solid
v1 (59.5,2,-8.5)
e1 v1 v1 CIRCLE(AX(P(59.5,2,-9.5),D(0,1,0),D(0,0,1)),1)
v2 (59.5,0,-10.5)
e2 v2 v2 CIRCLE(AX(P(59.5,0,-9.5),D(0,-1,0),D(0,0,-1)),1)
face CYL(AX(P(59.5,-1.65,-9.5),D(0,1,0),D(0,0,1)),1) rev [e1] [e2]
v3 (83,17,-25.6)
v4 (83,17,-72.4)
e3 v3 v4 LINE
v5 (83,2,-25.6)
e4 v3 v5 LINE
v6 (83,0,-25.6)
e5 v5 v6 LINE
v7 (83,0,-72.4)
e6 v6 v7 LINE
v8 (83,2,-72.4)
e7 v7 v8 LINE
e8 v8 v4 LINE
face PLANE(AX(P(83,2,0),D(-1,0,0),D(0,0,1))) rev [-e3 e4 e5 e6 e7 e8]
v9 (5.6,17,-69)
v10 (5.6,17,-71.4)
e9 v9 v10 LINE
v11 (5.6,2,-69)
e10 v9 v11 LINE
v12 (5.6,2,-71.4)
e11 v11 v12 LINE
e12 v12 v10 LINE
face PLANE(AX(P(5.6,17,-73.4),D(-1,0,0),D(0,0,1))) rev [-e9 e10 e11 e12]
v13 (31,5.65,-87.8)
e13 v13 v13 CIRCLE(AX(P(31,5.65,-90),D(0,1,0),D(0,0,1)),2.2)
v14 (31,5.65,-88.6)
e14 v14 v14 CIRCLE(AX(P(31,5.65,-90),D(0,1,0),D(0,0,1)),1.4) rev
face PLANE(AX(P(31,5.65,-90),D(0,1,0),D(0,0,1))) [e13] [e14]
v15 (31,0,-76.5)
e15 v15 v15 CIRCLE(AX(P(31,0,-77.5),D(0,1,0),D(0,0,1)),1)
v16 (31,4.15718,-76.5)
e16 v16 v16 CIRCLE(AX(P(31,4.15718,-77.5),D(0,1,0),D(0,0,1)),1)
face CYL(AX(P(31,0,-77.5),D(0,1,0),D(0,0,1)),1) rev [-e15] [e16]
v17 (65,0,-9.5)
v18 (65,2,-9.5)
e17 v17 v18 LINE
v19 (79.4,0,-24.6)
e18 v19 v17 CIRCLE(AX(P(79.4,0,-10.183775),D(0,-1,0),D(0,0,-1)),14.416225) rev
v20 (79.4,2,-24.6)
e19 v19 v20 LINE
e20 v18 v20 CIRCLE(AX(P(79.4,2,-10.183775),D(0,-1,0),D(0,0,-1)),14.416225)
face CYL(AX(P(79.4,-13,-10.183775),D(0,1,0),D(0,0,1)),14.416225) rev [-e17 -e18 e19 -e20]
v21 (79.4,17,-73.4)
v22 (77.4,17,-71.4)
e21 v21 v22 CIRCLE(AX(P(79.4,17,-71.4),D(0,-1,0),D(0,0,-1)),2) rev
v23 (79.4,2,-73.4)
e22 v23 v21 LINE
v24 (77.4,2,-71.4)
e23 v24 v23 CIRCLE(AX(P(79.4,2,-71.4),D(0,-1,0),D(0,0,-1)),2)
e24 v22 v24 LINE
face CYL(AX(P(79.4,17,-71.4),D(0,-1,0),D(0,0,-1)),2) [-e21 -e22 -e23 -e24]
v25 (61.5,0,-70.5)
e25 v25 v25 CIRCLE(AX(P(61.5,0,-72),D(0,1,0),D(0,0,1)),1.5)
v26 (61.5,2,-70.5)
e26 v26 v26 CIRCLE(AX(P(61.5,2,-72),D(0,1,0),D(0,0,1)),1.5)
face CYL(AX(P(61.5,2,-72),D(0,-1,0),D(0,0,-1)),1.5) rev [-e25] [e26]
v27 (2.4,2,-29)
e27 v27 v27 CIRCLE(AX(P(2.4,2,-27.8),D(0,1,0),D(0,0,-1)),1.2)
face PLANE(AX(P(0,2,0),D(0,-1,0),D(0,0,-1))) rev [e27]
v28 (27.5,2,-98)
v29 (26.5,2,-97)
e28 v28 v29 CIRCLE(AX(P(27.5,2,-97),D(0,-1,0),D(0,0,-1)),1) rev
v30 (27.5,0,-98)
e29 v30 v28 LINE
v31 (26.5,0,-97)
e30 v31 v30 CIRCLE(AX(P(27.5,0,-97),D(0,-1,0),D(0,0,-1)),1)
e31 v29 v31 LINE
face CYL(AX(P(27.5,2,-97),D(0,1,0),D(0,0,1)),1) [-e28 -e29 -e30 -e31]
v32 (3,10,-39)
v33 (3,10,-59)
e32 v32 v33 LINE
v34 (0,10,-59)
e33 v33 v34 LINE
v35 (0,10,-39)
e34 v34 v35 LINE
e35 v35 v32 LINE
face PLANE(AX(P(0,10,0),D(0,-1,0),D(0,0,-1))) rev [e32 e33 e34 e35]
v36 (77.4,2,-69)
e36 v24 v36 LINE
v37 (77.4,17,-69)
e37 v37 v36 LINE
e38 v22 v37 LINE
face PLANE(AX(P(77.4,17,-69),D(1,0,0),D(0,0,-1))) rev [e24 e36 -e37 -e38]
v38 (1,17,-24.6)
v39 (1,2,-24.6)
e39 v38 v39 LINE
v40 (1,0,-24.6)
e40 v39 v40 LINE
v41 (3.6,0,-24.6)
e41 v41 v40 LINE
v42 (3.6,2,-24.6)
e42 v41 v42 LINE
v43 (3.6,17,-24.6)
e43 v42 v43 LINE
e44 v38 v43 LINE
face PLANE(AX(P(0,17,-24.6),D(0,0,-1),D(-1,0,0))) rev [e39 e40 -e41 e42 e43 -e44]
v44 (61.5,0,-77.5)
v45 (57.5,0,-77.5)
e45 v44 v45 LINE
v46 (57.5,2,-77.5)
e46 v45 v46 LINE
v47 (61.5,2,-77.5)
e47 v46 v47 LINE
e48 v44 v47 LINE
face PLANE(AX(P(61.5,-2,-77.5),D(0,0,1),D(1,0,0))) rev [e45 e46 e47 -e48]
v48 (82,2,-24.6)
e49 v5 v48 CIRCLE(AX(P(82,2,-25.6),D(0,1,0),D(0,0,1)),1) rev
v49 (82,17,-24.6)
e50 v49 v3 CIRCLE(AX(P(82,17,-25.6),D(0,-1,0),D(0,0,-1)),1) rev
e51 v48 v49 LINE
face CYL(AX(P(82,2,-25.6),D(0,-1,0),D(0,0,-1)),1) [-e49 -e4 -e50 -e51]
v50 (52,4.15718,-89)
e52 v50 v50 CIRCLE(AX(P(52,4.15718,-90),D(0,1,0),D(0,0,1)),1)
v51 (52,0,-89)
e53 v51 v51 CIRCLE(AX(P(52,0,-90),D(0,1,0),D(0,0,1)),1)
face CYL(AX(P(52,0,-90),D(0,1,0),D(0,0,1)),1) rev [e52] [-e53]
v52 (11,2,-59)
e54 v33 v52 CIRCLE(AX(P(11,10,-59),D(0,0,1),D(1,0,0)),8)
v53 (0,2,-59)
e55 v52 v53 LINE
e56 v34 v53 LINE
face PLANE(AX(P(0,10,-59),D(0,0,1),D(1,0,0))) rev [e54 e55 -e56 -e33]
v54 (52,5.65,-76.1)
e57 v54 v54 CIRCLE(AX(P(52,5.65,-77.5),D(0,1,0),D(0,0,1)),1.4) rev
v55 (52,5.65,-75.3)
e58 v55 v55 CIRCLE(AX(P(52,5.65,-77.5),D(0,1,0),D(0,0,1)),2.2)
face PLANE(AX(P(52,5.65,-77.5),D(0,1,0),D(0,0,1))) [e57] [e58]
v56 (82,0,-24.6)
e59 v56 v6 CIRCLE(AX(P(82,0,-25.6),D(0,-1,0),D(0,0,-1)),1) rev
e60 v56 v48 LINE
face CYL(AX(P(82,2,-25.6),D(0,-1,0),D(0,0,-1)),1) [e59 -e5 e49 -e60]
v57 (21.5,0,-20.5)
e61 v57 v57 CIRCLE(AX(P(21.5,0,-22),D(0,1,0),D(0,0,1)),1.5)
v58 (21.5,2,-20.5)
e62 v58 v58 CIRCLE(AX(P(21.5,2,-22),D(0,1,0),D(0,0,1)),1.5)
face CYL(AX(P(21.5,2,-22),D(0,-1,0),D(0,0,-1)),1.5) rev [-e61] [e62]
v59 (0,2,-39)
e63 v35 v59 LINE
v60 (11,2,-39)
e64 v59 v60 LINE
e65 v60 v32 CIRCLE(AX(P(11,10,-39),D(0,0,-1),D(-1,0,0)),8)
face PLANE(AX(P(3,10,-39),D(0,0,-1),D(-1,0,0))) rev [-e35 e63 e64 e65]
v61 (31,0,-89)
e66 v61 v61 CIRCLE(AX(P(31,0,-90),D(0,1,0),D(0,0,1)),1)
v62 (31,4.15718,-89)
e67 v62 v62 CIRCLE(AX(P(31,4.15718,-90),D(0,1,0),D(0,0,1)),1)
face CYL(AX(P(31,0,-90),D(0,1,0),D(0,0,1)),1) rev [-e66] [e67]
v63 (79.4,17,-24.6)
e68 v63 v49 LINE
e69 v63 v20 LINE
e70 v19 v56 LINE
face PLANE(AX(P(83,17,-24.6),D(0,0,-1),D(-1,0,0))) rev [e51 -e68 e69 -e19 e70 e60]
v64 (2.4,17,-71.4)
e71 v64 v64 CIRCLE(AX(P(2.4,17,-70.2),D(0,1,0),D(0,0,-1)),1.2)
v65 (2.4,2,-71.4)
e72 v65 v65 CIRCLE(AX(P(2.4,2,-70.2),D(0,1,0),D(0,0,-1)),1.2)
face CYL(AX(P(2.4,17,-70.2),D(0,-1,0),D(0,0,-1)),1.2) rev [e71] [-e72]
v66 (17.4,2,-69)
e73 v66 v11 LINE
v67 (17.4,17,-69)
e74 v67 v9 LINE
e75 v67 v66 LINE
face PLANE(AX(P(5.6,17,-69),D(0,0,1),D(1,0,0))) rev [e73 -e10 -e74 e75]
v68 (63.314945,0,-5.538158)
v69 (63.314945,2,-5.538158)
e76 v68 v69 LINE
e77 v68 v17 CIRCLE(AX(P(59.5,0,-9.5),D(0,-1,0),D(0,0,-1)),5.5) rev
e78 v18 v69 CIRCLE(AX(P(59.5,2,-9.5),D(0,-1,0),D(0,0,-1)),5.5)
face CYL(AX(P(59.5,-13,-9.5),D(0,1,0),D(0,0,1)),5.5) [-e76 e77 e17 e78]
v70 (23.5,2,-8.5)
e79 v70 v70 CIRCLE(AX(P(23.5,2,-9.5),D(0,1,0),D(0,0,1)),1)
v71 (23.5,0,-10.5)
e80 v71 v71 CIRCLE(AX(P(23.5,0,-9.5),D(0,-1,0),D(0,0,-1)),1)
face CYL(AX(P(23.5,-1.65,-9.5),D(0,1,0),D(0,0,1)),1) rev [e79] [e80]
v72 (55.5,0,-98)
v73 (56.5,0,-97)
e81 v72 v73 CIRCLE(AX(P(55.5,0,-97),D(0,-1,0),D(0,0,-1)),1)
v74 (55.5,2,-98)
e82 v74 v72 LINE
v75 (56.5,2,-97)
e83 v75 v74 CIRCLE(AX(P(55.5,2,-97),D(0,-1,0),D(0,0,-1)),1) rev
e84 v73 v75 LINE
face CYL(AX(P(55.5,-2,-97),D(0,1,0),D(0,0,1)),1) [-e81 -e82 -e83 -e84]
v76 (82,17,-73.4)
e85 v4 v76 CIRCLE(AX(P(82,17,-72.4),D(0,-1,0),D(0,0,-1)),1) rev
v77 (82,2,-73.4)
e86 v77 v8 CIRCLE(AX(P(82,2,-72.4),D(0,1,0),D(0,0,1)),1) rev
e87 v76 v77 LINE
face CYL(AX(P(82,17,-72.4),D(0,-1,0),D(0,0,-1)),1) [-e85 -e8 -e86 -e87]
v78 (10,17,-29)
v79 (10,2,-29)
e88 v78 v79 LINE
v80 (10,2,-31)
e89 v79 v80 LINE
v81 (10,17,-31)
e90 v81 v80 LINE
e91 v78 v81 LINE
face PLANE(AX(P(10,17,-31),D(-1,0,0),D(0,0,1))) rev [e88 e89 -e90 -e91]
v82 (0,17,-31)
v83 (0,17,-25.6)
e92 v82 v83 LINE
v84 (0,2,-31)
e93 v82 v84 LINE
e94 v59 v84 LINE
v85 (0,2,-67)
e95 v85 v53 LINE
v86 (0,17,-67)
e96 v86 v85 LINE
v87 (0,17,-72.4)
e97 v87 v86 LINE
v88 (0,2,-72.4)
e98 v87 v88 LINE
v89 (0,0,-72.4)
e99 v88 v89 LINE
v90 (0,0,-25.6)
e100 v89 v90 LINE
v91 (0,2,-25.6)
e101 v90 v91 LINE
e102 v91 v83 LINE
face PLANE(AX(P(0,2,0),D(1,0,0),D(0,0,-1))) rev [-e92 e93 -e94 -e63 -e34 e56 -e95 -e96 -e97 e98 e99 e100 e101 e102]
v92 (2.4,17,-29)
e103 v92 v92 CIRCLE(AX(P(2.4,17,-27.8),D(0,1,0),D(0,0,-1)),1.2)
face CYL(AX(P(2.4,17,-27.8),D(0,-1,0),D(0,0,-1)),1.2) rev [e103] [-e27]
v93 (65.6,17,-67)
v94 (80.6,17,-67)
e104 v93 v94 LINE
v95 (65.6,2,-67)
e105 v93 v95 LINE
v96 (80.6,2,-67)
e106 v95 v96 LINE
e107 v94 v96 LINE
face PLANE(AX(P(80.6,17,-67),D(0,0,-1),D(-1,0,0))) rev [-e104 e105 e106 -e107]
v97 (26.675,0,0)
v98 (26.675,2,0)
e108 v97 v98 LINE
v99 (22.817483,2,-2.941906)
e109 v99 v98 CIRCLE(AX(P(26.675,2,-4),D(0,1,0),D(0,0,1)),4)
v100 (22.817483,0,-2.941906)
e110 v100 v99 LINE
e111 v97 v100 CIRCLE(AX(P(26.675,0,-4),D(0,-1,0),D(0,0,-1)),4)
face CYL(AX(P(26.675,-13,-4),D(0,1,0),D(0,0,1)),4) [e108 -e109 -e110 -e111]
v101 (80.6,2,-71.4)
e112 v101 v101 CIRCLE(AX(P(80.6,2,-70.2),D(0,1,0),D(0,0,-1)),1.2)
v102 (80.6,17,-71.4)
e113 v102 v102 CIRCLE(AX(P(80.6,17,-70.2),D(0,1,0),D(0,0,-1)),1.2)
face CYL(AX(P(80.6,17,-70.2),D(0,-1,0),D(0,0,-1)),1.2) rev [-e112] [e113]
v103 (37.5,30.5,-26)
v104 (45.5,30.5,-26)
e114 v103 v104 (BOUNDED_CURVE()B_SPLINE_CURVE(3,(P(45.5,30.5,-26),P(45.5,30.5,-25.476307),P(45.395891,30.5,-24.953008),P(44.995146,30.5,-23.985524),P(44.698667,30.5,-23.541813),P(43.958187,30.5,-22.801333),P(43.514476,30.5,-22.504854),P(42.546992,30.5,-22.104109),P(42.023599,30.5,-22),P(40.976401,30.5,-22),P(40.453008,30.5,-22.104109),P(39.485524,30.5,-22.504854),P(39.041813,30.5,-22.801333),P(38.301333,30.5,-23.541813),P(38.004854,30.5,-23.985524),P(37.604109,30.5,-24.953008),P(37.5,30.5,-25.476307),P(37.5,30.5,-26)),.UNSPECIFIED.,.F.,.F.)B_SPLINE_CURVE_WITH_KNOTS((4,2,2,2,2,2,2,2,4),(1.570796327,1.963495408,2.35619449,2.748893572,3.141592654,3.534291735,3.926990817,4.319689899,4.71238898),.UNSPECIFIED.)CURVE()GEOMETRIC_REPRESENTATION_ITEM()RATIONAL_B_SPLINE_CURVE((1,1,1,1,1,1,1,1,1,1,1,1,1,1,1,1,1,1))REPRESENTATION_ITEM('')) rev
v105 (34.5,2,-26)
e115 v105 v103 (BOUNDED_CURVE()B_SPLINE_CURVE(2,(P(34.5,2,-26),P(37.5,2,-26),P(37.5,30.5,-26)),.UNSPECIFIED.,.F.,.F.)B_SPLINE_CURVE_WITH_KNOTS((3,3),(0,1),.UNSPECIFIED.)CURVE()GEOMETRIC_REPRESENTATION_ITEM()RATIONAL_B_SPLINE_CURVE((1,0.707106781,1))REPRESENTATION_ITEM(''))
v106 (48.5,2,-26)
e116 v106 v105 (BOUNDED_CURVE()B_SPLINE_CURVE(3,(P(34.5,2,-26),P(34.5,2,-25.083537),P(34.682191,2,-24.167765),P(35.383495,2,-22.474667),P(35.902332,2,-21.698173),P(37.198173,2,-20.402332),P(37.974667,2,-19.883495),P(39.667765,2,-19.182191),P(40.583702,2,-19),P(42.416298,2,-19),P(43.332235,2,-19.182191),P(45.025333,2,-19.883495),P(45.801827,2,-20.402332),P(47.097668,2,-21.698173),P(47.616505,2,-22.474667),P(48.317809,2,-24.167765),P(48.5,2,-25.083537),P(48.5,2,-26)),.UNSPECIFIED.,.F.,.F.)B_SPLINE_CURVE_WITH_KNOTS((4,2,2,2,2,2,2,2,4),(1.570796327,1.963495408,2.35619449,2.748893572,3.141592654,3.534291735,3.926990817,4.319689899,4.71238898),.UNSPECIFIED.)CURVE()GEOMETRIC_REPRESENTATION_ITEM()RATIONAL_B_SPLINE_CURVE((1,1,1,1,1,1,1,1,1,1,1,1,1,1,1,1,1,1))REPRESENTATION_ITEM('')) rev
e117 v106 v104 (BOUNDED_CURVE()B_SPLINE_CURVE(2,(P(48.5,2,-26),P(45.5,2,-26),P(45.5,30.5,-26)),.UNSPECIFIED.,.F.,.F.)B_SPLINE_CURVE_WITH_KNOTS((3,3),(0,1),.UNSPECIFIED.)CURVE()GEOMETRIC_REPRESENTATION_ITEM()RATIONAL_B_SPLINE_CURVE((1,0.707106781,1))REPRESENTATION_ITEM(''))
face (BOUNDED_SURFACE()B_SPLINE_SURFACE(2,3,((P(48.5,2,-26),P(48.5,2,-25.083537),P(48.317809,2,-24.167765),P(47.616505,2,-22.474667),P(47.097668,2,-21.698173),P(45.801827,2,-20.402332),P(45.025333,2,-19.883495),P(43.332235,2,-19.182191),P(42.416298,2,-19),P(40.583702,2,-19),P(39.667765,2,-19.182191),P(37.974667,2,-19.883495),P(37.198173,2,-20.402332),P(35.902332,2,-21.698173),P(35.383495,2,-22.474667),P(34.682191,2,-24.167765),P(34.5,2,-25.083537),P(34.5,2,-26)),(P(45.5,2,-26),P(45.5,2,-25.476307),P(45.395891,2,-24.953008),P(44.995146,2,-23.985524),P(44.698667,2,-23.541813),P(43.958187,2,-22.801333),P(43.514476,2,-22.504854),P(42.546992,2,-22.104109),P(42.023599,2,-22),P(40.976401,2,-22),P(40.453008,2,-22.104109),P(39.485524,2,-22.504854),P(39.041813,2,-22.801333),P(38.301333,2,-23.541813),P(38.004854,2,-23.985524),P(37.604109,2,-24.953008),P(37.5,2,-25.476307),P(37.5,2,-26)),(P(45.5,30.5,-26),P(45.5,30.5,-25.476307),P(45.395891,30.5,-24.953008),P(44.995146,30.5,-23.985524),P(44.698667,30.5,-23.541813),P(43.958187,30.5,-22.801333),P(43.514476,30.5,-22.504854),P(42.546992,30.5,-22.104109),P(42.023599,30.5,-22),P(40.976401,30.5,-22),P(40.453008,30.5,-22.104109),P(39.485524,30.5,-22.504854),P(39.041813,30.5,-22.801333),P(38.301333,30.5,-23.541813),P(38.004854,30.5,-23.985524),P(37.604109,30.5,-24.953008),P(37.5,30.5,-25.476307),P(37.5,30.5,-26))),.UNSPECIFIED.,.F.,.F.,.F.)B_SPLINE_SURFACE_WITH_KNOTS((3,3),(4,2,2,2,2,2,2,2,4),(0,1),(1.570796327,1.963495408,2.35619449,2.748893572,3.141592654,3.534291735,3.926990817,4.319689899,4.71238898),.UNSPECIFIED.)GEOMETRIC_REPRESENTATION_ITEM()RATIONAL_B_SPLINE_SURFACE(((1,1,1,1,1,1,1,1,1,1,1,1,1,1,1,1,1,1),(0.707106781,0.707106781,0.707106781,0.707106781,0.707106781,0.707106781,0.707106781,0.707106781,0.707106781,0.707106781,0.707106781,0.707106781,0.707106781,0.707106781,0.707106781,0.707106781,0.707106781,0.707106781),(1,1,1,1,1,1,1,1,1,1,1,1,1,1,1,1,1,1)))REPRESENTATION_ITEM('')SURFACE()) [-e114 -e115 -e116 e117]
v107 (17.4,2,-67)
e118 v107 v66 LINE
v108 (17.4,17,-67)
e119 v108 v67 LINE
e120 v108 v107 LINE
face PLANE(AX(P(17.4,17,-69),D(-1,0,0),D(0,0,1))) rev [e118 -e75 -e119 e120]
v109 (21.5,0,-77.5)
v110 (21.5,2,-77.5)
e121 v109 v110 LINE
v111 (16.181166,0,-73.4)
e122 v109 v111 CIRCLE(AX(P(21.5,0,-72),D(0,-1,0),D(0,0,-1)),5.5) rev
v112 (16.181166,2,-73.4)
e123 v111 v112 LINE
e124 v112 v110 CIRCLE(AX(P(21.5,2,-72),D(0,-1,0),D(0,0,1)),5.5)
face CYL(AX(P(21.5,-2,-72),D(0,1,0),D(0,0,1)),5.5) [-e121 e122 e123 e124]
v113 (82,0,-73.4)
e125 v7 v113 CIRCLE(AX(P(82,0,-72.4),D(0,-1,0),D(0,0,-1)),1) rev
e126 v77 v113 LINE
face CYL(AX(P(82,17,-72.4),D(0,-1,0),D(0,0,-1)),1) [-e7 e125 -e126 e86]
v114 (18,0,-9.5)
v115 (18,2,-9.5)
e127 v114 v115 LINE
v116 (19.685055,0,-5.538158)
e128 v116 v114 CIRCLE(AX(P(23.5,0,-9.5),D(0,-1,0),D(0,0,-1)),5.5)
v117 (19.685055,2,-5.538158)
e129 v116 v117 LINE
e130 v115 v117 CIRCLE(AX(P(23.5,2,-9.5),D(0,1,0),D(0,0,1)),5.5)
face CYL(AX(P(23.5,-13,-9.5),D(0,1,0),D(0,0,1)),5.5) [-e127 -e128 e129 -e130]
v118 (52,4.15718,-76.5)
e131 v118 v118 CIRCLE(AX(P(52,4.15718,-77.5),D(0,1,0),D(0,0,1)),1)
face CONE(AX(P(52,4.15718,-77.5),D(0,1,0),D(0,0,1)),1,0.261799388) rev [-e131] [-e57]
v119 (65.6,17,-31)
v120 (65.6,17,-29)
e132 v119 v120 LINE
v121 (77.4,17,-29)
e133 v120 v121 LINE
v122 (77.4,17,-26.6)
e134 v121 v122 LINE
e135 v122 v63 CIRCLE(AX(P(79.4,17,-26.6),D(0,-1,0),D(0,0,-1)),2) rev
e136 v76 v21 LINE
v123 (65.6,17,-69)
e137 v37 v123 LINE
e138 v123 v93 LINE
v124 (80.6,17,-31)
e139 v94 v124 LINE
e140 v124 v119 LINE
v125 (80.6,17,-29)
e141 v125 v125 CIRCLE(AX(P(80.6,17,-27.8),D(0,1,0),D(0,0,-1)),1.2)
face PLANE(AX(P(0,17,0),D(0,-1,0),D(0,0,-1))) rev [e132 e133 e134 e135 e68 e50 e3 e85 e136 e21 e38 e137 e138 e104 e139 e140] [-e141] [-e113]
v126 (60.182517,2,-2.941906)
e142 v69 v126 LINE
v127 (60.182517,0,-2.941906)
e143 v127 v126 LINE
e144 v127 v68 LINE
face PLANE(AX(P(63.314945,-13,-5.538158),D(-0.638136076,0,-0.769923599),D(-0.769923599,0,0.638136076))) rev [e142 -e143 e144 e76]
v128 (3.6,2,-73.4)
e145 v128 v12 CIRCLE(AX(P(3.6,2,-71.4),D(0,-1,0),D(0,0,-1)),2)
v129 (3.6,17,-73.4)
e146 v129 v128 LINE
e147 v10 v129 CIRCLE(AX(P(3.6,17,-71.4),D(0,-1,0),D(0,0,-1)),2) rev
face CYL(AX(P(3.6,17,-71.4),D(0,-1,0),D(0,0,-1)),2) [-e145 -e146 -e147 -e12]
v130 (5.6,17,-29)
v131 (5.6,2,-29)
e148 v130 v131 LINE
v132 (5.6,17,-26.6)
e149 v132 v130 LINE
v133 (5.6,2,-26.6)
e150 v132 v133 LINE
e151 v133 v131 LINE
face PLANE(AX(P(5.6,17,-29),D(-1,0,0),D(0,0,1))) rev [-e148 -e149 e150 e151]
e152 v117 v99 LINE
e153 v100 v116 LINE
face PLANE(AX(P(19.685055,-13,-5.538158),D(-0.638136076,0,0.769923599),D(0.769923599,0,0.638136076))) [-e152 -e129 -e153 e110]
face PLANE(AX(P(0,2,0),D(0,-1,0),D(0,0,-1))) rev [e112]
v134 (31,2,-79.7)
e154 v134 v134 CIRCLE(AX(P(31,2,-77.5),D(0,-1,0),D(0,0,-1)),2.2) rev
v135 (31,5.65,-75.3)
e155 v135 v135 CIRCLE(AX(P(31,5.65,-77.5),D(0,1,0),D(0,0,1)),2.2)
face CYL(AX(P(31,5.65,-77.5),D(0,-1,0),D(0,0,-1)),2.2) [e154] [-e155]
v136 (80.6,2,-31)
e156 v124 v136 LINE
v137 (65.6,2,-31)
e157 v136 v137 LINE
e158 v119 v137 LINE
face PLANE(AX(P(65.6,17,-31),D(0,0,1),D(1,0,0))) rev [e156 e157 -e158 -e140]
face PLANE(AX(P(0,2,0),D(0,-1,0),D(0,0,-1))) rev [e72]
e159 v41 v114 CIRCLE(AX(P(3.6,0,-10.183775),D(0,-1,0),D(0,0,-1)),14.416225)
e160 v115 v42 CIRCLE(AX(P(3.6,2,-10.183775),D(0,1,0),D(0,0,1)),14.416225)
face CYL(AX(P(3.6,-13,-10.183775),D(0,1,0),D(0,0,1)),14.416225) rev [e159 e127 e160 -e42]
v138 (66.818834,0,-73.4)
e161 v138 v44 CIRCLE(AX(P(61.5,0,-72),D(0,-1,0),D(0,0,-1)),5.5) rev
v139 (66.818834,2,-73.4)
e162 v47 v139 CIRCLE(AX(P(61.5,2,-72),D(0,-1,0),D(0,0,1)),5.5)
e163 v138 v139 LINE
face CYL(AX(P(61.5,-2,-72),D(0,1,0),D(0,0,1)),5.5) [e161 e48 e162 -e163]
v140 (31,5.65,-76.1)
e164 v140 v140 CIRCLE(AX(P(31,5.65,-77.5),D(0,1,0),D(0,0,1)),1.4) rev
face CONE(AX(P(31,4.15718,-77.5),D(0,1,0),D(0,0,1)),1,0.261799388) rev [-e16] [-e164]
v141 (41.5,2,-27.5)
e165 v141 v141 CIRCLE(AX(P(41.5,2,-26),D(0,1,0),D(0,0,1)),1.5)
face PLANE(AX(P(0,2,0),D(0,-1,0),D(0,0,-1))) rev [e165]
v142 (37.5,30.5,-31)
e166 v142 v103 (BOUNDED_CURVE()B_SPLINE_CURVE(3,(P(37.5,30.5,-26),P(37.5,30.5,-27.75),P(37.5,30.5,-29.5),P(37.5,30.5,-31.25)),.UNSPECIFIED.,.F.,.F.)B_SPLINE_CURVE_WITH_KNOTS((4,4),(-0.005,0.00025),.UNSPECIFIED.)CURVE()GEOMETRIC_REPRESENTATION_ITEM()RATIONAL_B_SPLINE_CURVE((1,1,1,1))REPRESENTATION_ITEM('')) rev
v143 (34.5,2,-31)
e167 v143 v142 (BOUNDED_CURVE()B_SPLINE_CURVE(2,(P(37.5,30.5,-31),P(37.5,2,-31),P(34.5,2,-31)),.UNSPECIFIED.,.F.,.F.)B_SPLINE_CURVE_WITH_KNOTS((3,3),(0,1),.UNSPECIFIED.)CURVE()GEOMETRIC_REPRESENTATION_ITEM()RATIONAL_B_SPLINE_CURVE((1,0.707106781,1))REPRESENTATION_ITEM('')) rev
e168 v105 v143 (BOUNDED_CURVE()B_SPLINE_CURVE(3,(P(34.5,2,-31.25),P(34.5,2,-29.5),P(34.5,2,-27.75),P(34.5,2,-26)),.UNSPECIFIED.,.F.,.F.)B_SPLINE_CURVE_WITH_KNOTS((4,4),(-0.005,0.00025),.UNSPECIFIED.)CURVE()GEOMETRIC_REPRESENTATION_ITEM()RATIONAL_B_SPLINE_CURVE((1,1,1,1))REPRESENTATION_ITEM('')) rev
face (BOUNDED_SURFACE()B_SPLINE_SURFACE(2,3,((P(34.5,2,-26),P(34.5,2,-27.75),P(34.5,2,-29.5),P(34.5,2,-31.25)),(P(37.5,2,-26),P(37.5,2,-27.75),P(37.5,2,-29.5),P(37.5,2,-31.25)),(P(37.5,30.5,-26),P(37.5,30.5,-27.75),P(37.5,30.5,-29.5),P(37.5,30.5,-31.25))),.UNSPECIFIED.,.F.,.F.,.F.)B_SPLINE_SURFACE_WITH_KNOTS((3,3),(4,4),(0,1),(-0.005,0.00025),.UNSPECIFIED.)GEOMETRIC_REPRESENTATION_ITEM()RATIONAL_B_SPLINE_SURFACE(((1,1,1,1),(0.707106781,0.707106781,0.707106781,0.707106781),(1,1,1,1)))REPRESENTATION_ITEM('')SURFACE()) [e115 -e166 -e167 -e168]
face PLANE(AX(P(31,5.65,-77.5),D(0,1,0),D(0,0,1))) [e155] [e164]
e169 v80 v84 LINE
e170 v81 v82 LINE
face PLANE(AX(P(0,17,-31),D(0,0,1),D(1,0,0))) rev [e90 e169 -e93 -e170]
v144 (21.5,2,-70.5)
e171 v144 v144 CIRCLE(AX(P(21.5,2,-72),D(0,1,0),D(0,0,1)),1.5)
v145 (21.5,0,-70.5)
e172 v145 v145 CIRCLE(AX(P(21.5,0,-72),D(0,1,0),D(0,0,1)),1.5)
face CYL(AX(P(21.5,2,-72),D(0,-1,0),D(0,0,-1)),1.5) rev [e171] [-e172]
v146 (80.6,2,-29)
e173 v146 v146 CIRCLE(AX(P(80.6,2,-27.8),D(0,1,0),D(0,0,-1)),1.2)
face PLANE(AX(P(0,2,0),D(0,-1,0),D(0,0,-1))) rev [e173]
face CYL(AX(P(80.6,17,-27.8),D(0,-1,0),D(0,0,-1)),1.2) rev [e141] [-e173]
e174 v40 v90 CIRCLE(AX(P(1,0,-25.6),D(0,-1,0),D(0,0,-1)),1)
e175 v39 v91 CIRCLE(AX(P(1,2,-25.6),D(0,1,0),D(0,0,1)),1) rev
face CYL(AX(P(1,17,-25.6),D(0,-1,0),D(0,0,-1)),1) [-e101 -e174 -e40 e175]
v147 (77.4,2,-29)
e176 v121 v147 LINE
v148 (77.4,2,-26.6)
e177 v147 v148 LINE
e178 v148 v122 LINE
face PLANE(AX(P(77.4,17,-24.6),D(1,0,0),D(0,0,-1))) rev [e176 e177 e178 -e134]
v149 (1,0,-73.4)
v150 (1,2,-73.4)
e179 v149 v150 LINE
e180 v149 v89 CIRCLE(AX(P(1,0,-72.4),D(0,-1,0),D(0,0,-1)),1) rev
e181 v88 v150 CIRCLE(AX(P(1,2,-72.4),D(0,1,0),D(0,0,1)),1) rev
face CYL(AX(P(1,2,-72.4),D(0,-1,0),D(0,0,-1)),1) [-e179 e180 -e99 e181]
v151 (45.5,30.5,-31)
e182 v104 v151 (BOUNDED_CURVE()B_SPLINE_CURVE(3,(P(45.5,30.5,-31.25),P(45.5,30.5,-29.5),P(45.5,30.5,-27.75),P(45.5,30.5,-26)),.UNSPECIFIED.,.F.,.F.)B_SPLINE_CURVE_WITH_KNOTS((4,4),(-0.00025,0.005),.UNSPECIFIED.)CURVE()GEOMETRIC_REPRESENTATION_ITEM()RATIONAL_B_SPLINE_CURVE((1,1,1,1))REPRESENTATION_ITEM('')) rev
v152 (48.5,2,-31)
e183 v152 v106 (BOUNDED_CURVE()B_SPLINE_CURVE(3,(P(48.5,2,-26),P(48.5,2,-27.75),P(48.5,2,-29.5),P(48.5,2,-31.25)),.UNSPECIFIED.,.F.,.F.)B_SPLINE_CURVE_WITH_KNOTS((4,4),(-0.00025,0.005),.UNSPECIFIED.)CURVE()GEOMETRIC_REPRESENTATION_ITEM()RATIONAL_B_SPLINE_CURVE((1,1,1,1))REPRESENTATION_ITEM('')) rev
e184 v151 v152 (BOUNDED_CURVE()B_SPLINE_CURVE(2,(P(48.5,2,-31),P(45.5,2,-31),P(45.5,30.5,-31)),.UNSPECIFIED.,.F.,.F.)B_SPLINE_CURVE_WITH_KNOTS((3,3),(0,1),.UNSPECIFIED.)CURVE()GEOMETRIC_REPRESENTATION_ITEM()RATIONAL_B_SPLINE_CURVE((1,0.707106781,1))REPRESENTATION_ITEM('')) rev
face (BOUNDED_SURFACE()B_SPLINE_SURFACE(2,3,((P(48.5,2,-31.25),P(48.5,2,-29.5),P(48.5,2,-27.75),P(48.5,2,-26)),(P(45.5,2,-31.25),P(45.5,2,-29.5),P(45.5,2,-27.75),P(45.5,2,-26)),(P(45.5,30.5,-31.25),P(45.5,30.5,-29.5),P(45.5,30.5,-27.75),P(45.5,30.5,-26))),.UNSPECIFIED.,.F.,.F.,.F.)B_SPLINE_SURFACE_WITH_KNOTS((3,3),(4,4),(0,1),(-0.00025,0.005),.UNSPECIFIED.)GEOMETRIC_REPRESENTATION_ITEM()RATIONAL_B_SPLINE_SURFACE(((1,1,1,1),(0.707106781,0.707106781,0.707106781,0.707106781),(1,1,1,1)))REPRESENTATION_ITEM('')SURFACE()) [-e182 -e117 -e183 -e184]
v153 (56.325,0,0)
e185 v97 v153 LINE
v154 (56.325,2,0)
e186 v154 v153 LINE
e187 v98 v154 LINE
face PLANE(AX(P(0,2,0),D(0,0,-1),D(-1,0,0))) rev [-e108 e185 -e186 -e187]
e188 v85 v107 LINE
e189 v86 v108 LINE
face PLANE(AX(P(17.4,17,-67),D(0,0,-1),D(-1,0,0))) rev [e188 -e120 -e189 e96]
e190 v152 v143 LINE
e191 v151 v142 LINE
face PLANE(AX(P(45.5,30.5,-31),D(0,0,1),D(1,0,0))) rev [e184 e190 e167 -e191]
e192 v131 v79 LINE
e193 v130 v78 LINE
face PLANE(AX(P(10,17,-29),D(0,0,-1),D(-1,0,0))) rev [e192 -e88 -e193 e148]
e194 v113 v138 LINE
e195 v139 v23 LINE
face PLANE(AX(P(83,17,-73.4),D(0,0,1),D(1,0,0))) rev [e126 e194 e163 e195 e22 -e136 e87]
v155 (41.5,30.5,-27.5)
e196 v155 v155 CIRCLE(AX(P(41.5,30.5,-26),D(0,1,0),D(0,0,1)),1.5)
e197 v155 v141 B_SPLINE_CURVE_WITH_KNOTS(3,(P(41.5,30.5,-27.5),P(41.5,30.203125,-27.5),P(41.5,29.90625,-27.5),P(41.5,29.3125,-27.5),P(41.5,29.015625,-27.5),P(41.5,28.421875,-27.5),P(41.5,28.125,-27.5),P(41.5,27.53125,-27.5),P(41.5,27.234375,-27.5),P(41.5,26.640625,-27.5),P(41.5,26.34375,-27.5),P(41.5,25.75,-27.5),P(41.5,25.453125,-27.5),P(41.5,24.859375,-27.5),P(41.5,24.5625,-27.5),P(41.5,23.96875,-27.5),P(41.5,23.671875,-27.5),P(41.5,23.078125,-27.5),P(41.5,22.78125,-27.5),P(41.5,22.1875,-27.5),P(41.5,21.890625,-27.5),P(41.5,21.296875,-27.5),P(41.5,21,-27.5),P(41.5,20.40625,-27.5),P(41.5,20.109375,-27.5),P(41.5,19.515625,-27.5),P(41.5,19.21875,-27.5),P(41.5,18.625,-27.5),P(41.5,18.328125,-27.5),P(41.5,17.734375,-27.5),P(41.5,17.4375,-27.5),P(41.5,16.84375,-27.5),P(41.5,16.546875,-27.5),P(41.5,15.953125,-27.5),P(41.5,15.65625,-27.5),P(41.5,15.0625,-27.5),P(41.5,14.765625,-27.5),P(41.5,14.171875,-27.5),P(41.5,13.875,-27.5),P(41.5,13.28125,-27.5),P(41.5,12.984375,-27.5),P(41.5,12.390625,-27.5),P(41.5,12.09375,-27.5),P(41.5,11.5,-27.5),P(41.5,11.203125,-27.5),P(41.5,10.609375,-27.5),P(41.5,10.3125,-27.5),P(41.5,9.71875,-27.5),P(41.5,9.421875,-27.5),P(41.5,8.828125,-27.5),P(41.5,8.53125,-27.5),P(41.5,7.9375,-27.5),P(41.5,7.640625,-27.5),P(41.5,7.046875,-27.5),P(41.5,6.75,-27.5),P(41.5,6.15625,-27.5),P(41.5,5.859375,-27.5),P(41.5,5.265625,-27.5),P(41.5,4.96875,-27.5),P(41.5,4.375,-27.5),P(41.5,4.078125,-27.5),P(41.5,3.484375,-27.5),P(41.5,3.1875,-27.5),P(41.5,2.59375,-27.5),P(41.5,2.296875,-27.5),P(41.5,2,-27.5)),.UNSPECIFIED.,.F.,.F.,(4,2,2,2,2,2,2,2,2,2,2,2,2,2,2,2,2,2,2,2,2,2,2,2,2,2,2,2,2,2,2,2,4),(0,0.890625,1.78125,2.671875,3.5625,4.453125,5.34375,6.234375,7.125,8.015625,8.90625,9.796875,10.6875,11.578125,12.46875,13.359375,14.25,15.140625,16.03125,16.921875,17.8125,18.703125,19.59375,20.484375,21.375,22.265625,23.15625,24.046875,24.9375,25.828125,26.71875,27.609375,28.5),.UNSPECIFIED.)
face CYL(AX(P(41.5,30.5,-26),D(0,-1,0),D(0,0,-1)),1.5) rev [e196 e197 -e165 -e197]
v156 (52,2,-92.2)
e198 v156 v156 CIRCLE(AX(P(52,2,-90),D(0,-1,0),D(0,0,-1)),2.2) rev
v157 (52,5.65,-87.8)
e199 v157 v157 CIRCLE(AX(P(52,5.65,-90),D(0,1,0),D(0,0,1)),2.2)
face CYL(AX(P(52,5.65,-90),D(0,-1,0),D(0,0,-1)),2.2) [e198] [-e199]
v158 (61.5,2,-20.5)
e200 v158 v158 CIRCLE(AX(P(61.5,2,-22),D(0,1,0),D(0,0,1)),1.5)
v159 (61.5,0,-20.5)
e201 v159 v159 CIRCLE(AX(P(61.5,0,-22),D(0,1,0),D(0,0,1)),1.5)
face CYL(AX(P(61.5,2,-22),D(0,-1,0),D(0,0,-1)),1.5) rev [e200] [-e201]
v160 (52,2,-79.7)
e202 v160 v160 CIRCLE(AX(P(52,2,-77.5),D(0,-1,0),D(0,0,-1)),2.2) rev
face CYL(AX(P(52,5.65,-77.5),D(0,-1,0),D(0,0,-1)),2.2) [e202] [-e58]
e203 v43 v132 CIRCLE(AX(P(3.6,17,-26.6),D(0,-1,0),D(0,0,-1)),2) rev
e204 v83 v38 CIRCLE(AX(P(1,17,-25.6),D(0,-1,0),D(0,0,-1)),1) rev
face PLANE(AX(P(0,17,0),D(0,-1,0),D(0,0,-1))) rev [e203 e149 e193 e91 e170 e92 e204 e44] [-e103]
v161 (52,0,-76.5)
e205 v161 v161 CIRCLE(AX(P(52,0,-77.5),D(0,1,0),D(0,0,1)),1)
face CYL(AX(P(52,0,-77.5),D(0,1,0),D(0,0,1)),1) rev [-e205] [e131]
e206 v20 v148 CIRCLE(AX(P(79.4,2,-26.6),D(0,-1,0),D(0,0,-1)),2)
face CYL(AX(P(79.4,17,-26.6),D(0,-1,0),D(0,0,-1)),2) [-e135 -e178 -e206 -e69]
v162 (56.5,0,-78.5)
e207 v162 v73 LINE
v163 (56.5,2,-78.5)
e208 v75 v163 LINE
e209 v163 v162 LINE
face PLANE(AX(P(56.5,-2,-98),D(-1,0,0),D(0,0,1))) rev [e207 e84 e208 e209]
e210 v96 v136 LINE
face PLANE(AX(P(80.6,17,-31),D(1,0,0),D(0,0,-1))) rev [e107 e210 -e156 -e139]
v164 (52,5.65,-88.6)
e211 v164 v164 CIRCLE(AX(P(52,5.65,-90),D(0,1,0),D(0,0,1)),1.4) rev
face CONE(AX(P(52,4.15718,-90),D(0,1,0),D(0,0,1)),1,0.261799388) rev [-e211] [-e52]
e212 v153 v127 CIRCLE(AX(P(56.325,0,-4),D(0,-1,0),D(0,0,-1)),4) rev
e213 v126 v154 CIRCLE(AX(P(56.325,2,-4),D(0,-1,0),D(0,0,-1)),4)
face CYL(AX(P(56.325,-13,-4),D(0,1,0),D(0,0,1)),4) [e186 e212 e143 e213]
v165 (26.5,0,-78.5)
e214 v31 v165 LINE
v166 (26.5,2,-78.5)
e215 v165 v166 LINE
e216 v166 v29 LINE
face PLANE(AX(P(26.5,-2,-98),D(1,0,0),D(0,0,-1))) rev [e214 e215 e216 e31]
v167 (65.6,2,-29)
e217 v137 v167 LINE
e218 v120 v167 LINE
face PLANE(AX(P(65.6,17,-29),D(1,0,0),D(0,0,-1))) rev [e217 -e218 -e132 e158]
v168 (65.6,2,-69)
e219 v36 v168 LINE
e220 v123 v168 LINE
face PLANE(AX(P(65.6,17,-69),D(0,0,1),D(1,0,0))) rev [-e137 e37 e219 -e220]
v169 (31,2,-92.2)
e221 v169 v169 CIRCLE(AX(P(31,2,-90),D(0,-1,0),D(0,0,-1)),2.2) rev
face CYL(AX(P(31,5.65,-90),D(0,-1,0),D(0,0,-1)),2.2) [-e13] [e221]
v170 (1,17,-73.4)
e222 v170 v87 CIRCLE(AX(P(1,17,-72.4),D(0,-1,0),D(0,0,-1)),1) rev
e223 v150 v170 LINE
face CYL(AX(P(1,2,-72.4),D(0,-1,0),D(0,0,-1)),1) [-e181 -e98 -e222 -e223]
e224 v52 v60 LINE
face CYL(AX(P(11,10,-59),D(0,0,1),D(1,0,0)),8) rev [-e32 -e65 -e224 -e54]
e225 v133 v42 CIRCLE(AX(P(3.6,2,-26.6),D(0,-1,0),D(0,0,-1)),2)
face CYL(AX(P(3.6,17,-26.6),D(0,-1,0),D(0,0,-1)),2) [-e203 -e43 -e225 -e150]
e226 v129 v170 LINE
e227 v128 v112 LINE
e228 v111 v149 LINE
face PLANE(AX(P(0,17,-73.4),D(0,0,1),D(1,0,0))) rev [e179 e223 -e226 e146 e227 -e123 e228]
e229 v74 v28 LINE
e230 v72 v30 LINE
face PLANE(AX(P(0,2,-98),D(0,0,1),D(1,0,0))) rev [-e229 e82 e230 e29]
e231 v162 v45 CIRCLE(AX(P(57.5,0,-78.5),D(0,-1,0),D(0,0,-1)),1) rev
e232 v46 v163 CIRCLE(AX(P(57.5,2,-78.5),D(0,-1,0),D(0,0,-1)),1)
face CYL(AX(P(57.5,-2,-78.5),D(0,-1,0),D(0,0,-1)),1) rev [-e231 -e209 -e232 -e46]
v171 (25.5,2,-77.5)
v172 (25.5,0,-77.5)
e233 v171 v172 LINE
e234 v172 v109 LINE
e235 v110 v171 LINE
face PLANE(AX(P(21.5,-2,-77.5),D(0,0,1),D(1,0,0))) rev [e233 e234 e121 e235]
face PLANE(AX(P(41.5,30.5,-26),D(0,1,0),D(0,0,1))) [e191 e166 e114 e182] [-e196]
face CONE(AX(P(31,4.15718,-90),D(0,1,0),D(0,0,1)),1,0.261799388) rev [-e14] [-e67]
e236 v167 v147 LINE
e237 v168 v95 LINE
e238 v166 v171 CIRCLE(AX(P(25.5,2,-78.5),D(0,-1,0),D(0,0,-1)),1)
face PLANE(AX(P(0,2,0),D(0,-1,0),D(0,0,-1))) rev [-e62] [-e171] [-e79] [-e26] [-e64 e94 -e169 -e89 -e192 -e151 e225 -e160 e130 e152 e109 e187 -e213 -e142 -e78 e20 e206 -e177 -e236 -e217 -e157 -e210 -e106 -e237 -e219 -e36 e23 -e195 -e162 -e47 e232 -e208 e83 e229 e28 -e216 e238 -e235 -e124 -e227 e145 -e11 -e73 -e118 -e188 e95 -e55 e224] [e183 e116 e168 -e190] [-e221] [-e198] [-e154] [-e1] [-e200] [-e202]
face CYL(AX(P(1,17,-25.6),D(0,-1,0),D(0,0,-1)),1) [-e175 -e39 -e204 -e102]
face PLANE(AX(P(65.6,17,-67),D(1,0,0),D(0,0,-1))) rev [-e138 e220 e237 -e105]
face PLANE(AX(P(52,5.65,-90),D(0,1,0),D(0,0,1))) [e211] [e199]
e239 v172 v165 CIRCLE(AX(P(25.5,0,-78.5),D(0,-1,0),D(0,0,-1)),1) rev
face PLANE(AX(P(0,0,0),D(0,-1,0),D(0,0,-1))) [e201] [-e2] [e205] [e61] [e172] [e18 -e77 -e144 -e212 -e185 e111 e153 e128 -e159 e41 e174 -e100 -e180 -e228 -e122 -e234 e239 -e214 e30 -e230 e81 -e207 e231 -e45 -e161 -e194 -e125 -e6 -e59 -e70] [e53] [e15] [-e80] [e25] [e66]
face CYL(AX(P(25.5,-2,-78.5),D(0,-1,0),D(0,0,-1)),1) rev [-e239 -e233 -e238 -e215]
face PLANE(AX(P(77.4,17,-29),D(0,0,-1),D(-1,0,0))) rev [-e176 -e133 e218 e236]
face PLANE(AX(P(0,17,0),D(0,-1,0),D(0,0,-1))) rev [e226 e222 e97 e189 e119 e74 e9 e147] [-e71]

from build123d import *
from OCP.BRepFilletAPI import BRepFilletAPI_MakeChamfer, BRepFilletAPI_MakeFillet

# Parameters (mm, degrees)
SKETCH1_W           = 83
SKETCH1_H           = 98
SKETCH1_R           = 1.5
BOSS_EXTRUDE1_DEPTH = 2
FILLET1_R           = 5
SKETCH4_R           = 1.2
BOSS_EXTRUDE3_DEPTH = 15
FILLET2_R1          = 2
FILLET2_R2          = 1
CUT_EXTRUDE1_DEPTH  = 15
SKETCH7_R           = 2.2
BOSS_EXTRUDE4_DEPTH = 3.65
SKETCH8_R           = 1
CUT_EXTRUDE2_DEPTH  = 129.925647177
CHAMFER2_SIZE       = 0.4
CHAMFER2_SIZE2      = 1.492820323
SKETCH9_R           = 1
CUT_EXTRUDE3_DEPTH  = 3.65
SKETCH10_W          = 3
SKETCH10_H          = 20
BOSS_EXTRUDE5_DEPTH = 8
CUT_EXTRUDE4_DEPTH  = 4
FILLET4_R           = 1
SKETCH12_W          = 83
SKETCH12_H          = 48.8
CUT_EXTRUDE5_DEPTH  = 15
SKETCH13_R          = 1.2
BOSS_EXTRUDE6_DEPTH = 15
SKETCH14_R          = 1.2
BOSS_EXTRUDE7_DEPTH = 15
SKETCH15_W          = 3
SKETCH15_H          = 20
BOSS_EXTRUDE8_DEPTH = 8
FILLET5_R           = 8
FILLET6_R1          = 2
FILLET6_R2          = 1
SKETCH17_R          = 1.5
BOSS_EXTRUDE9_DEPTH = 28.5
FILLET8_SIZE        = 3
FILLET8_SIZE_2      = 28.5


# Some blends are built 0.0001 mm under size
with BuildPart() as part:
    # Sketch1 → Boss-Extrude1 (new body)
    with BuildSketch(Plane(origin=(0, 0, 0), x_dir=(1, 0, 0), z_dir=(0, 1, 0))):
        with Locations((41.5, 49)):
            Rectangle(SKETCH1_W, SKETCH1_H)
        with Locations(Location((21.5, 72, 0), (0, 0, 270))):
            Circle(SKETCH1_R, mode=Mode.SUBTRACT)
        with Locations(Location((61.5, 72, 0), (0, 0, 270))):
            Circle(SKETCH1_R, mode=Mode.SUBTRACT)
        with Locations(Location((61.5, 22, 0), (0, 0, 270))):
            Circle(SKETCH1_R, mode=Mode.SUBTRACT)
        with Locations(Location((21.5, 22, 0), (0, 0, 270))):
            Circle(SKETCH1_R, mode=Mode.SUBTRACT)
    extrude(amount=BOSS_EXTRUDE1_DEPTH)

    # Fillet1
    fillet1_edges = [part.edges().sort_by_distance(p)[0] for p in [
        (0, 1, -98),
        (83, 1, -98),
        (83, 1, 0),
        (0, 1, 0),
    ]]
    fillet(fillet1_edges, radius=FILLET1_R)

    # Sketch4 → Boss-Extrude3 (add)
    # profile 1 of 3: a face of its own
    with BuildSketch(Plane(origin=(0, 2, 0), x_dir=(1, 0, 0), z_dir=(0, 1, 0))):
        Polygon((2.4, 67), (2.4, 31), (17.4, 31), (17.4, 29), (5.6, 29), (5.6, 24.6), (0, 24.6), (0, 29), (0, 69), (0, 73.4), (5.6, 73.4), (5.6, 69), (17.4, 69), (17.4, 67), align=None)
        with Locations(Location((2.4, 70.2, 0), (0, 0, 270))):
            Circle(SKETCH4_R, mode=Mode.SUBTRACT)
        with Locations(Location((2.4, 27.8, 0), (0, 0, 270))):
            Circle(SKETCH4_R, mode=Mode.SUBTRACT)
    # profile 2 of 3: a face of its own
    with BuildSketch(Plane(origin=(0, 2, 0), x_dir=(1, 0, 0), z_dir=(0, 1, 0))):
        Polygon((77.4, 69), (65.6, 69), (65.6, 67), (80.6, 67), (83, 67), (83, 69), (83, 73.4), (77.4, 73.4), align=None)
        with Locations(Location((80.6, 70.2, 0), (0, 0, 90))):
            Circle(SKETCH4_R, mode=Mode.SUBTRACT)
    # profile 3 of 3: a face of its own
    with BuildSketch(Plane(origin=(0, 2, 0), x_dir=(1, 0, 0), z_dir=(0, 1, 0))):
        Polygon((77.4, 29), (65.6, 29), (65.6, 31), (80.6, 31), (83, 31), (83, 29), (83, 24.6), (77.4, 24.6), align=None)
        with Locations(Location((80.6, 27.8, 0), (0, 0, 90))):
            Circle(SKETCH4_R, mode=Mode.SUBTRACT)
    extrude(amount=BOSS_EXTRUDE3_DEPTH)

    # Fillet2: one fillet with a radius per group of edges: ONE call of the kernel's fillet builder (fillet() takes one radius for all edges)
    fillet2_edges_1 = [part.edges().sort_by_distance(p)[0] for p in [
        (5.6, 9.5, -24.6),
        (5.6, 9.5, -73.4),
        (77.4, 9.5, -73.4),
        (77.4, 9.5, -24.6),
    ]]
    fillet2_edges_2 = [part.edges().sort_by_distance(p)[0] for p in [
        (0, 9.5, -73.4),
        (0, 9.5, -24.6),
        (83, 9.5, -73.4),
        (83, 9.5, -24.6),
    ]]
    fillet2 = BRepFilletAPI_MakeFillet(part.part.solid().wrapped)
    for e in fillet2_edges_1:
        fillet2.Add(FILLET2_R1, e.wrapped)
    for e in fillet2_edges_2:
        fillet2.Add(FILLET2_R2, e.wrapped)
    add(Compound.cast(fillet2.Shape()), mode=Mode.REPLACE)

    # Sketch6 → Cut-Extrude1 (cut)
    with BuildSketch(Plane(origin=(0, 2, 0), x_dir=(1, 0, 0), z_dir=(0, 1, 0))):
        with BuildLine():
            Line((19.685054688, 5.53815797), (22.817482984, 2.941906208))
            ThreePointArc((22.817482984, 2.941906208), (24.24934289, 0.819404524), (26.675, 0))
            Line((26.675, 0), (56.325, 0))
            ThreePointArc((56.325, 0), (58.75065711, 0.819404524), (60.182517016, 2.941906208))
            Line((60.182517016, 2.941906208), (63.314945312, 5.53815797))
            ThreePointArc((63.314945312, 5.53815797), (64.561234988, 7.347350379), (65, 9.5))
            ThreePointArc((65, 9.5), (68.9672391, 20.132897812), (79.4, 24.6))
            Line((79.4, 24.6), (82, 24.6))
            ThreePointArc((82, 24.6), (82.707106781, 24.892893219), (83, 25.6))
            Line((83, 25.6), (83, -9.4))
            Line((83, -9.4), (0, -9.4))
            Line((0, -9.4), (0, 25.6))
            ThreePointArc((0, 25.6), (0.292893219, 24.892893219), (1, 24.6))
            Line((1, 24.6), (3.6, 24.6))
            ThreePointArc((3.6, 24.6), (14.0327609, 20.132897812), (18, 9.5))
            ThreePointArc((18, 9.5), (18.438765012, 7.347350379), (19.685054688, 5.53815797))
        make_face()
    extrude(amount=-CUT_EXTRUDE1_DEPTH, mode=Mode.SUBTRACT)

    # Sketch7 → Boss-Extrude4 (add)
    with BuildSketch(Plane(origin=(0, 2, 0), x_dir=(1, 0, 0), z_dir=(0, 1, 0))):
        with Locations(Location((31, 90, 0), (0, 0, 90))):
            Circle(SKETCH7_R)
        with Locations(Location((52, 90, 0), (0, 0, 90))):
            Circle(SKETCH7_R)
        with Locations(Location((52, 77.5, 0), (0, 0, 90))):
            Circle(SKETCH7_R)
        with Locations(Location((31, 77.5, 0), (0, 0, 90))):
            Circle(SKETCH7_R)
    extrude(amount=BOSS_EXTRUDE4_DEPTH)

    # Sketch8 → Cut-Extrude2 (cut, through all)
    with BuildSketch(Plane(origin=(0, 5.65, 0), x_dir=(1, 0, 0), z_dir=(0, 1, 0))):
        with Locations(Location((31, 77.5, 0), (0, 0, 270))):
            Circle(SKETCH8_R)
        with Locations(Location((52, 77.5, 0), (0, 0, 270))):
            Circle(SKETCH8_R)
        with Locations(Location((52, 90, 0), (0, 0, 270))):
            Circle(SKETCH8_R)
        with Locations(Location((31, 90, 0), (0, 0, 270))):
            Circle(SKETCH8_R)
    extrude(amount=-CUT_EXTRUDE2_DEPTH, mode=Mode.SUBTRACT)

    # Chamfer2: one chamfer whose edges measure the first distance from different faces: ONE call of the kernel's chamfer builder (chamfer() names one face for all edges)
    chamfer2_edges_1 = [part.edges().sort_by_distance(p)[0] for p in [
        (31, 5.65, -91),
    ]]
    chamfer2_side_1 = [part.faces().sort_by_distance(p)[0] for p in [
        (31, 5.65, -87.862225397),
    ]]
    chamfer2_edges_2 = [part.edges().sort_by_distance(p)[0] for p in [
        (52, 5.65, -91),
    ]]
    chamfer2_side_2 = [part.faces().sort_by_distance(p)[0] for p in [
        (52, 5.65, -87.862225397),
    ]]
    chamfer2_edges_3 = [part.edges().sort_by_distance(p)[0] for p in [
        (52, 5.65, -78.5),
    ]]
    chamfer2_side_3 = [part.faces().sort_by_distance(p)[0] for p in [
        (52, 5.65, -75.362225397),
    ]]
    chamfer2_edges_4 = [part.edges().sort_by_distance(p)[0] for p in [
        (31, 5.65, -78.5),
    ]]
    chamfer2_side_4 = [part.faces().sort_by_distance(p)[0] for p in [
        (31, 5.65, -75.362225397),
    ]]
    chamfer2 = BRepFilletAPI_MakeChamfer(part.part.solid().wrapped)
    for e in chamfer2_edges_1:
        chamfer2.Add(CHAMFER2_SIZE, CHAMFER2_SIZE2, e.wrapped, chamfer2_side_1[0].wrapped)  # the first distance lies on this face
    for e in chamfer2_edges_2:
        chamfer2.Add(CHAMFER2_SIZE, CHAMFER2_SIZE2, e.wrapped, chamfer2_side_2[0].wrapped)  # the first distance lies on this face
    for e in chamfer2_edges_3:
        chamfer2.Add(CHAMFER2_SIZE, CHAMFER2_SIZE2, e.wrapped, chamfer2_side_3[0].wrapped)  # the first distance lies on this face
    for e in chamfer2_edges_4:
        chamfer2.Add(CHAMFER2_SIZE, CHAMFER2_SIZE2, e.wrapped, chamfer2_side_4[0].wrapped)  # the first distance lies on this face
    add(Compound.cast(chamfer2.Shape()), mode=Mode.REPLACE)

    # Sketch9 → Cut-Extrude3 (cut)
    with BuildSketch(Plane(origin=(0, 2, 0), x_dir=(1, 0, 0), z_dir=(0, 1, 0))):
        with Locations(Location((23.5, 9.5, 0), (0, 0, 270))):
            Circle(SKETCH9_R)
        with Locations(Location((59.5, 9.5, 0), (0, 0, 270))):
            Circle(SKETCH9_R)
    extrude(amount=-CUT_EXTRUDE3_DEPTH, mode=Mode.SUBTRACT)

    # Sketch10 → Boss-Extrude5 (add)
    with BuildSketch(Plane(origin=(0, 2, 0), x_dir=(1, 0, 0), z_dir=(0, 1, 0))):
        with Locations((81.5, 49)):
            Rectangle(SKETCH10_W, SKETCH10_H)
    extrude(amount=BOSS_EXTRUDE5_DEPTH)

    # Sketch11 → Cut-Extrude4 (cut)
    with BuildSketch(Plane(origin=(0, 2, 0), x_dir=(1, 0, 0), z_dir=(0, 1, 0))):
        with BuildLine():
            Line((0, 93), (0, 72.4))
            ThreePointArc((0, 72.4), (0.292893219, 73.107106781), (1, 73.4))
            Line((1, 73.4), (3.6, 73.4))
            Line((3.6, 73.4), (16.181165541, 73.4))
            ThreePointArc((16.181165541, 73.4), (18.142173322, 76.356030303), (21.5, 77.5))
            Line((21.5, 77.5), (26.5, 77.5))
            Line((26.5, 77.5), (26.5, 98))
            Line((26.5, 98), (5, 98))
            ThreePointArc((5, 98), (1.464466094, 96.535533906), (0, 93))
        make_face()
        with BuildLine():
            Line((78, 98), (56.5, 98))
            Line((56.5, 98), (56.5, 77.5))
            Line((56.5, 77.5), (61.5, 77.5))
            ThreePointArc((61.5, 77.5), (64.857826678, 76.356030303), (66.818834459, 73.4))
            Line((66.818834459, 73.4), (79.4, 73.4))
            Line((79.4, 73.4), (82, 73.4))
            ThreePointArc((82, 73.4), (82.707106781, 73.107106781), (83, 72.4))
            Line((83, 72.4), (83, 93))
            ThreePointArc((83, 93), (81.535533906, 96.535533906), (78, 98))
        make_face()
    extrude(amount=-CUT_EXTRUDE4_DEPTH, mode=Mode.SUBTRACT)

    # Fillet4
    fillet4_edges = [part.edges().sort_by_distance(p)[0] for p in [
        (26.5, 1, -98),
        (26.5, 1, -77.5),
        (56.5, 1, -77.5),
        (56.5, 1, -98),
    ]]
    fillet(fillet4_edges, radius=FILLET4_R)

    # Sketch12 → Cut-Extrude5 (cut)
    with BuildSketch(Plane(origin=(0, 17, 0), x_dir=(1, 0, 0), z_dir=(0, 1, 0))):
        with Locations((41.5, 49)):
            Rectangle(SKETCH12_W, SKETCH12_H)
    extrude(amount=-CUT_EXTRUDE5_DEPTH, mode=Mode.SUBTRACT)

    # Sketch13 → Boss-Extrude6 (add)
    with BuildSketch(Plane(origin=(0, 2, 0), x_dir=(1, 0, 0), z_dir=(0, 1, 0))):
        Polygon((83, 29), (83, 24.6), (77.4, 24.6), (77.4, 29), (65.6, 29), (65.6, 31), (80.6, 31), (80.6, 67), (65.6, 67), (65.6, 69), (77.4, 69), (77.4, 73.4), (83, 73.4), (83, 69), align=None)
        with Locations(Location((80.6, 70.2, 0), (0, 0, 90))):
            Circle(SKETCH13_R, mode=Mode.SUBTRACT)
        with Locations(Location((80.6, 27.8, 0), (0, 0, 90))):
            Circle(SKETCH13_R, mode=Mode.SUBTRACT)
    extrude(amount=BOSS_EXTRUDE6_DEPTH)

    # Sketch14 → Boss-Extrude7 (add)
    # profile 1 of 2: a face of its own
    with BuildSketch(Plane(origin=(0, 2, 0), x_dir=(1, 0, 0), z_dir=(0, 1, 0))):
        Polygon((10, 29), (5.6, 29), (5.6, 24.6), (0, 24.6), (0, 29), (0, 31), (2.4, 31), (10, 31), align=None)
        with Locations(Location((2.4, 27.8, 0), (0, 0, 90))):
            Circle(SKETCH14_R, mode=Mode.SUBTRACT)
    # profile 2 of 2: a face of its own
    with BuildSketch(Plane(origin=(0, 2, 0), x_dir=(1, 0, 0), z_dir=(0, 1, 0))):
        Polygon((17.4, 69), (17.4, 67), (2.4, 67), (0, 67), (0, 69), (0, 73.4), (5.6, 73.4), (5.6, 69), align=None)
        with Locations(Location((2.4, 70.2, 0), (0, 0, 90))):
            Circle(SKETCH14_R, mode=Mode.SUBTRACT)
    extrude(amount=BOSS_EXTRUDE7_DEPTH)

    # Sketch15 → Boss-Extrude8 (add)
    with BuildSketch(Plane(origin=(0, 2, 0), x_dir=(1, 0, 0), z_dir=(0, 1, 0))):
        with Locations((1.5, 49)):
            Rectangle(SKETCH15_W, SKETCH15_H)
    extrude(amount=BOSS_EXTRUDE8_DEPTH)

    # Fillet5
    fillet5_edges = [part.edges().sort_by_distance(p)[0] for p in [
        (3, 2, -49),
    ]]
    fillet(fillet5_edges, radius=FILLET5_R - 0.0001)  # a hair under: the kernel refuses the full size

    # Fillet6: one fillet with a radius per group of edges: ONE call of the kernel's fillet builder (fillet() takes one radius for all edges)
    fillet6_edges_1 = [part.edges().sort_by_distance(p)[0] for p in [
        (5.6, 9.5, -24.6),
        (5.6, 9.5, -73.4),
        (77.4, 9.5, -73.4),
        (77.4, 9.5, -24.6),
    ]]
    fillet6_edges_2 = [part.edges().sort_by_distance(p)[0] for p in [
        (0, 9.5, -73.4),
        (0, 9.5, -24.6),
        (83, 9.5, -24.6),
        (83, 9.5, -73.4),
    ]]
    fillet6 = BRepFilletAPI_MakeFillet(part.part.solid().wrapped)
    for e in fillet6_edges_1:
        fillet6.Add(FILLET6_R1, e.wrapped)
    for e in fillet6_edges_2:
        fillet6.Add(FILLET6_R2, e.wrapped)
    add(Compound.cast(fillet6.Shape()), mode=Mode.REPLACE)

    # Sketch17 → Boss-Extrude9 (add)
    with BuildSketch(Plane(origin=(0, 2, 0), x_dir=(1, 0, 0), z_dir=(0, 1, 0))):
        with BuildLine():
            Line((45.5, 31), (37.5, 31))
            Line((37.5, 31), (37.5, 26))
            ThreePointArc((37.5, 26), (41.5, 22), (45.5, 26))
            Line((45.5, 26), (45.5, 31))
        make_face()
        with Locations(Location((41.5, 26, 0), (0, 0, 90))):
            Circle(SKETCH17_R, mode=Mode.SUBTRACT)
    extrude(amount=BOSS_EXTRUDE9_DEPTH)

    # Fillet8
    # an asymmetric fillet: 28.5, 3 mm, written as the material it adds along each edge
    with BuildSketch(Plane(origin=(37.5, 2, -31), x_dir=(-1, 0, 0), z_dir=(0, 0, 1)), Plane(origin=(45.5, 2, -26), x_dir=(1, 0, 0), z_dir=(0, 0, -1))) as fillet8_piece_1:
        with BuildLine():
            Bezier((FILLET8_SIZE, 0), (0, 0), (0, -FILLET8_SIZE_2), weights=[1, 0.707106781, 1])
            Line((0, -FILLET8_SIZE_2), (0, 0))
            Line((0, 0), (FILLET8_SIZE, 0))
        make_face()
    extrude(amount=5)
    with BuildSketch(Plane(origin=(41.5, 2, -26), x_dir=(-1, 0, 0), z_dir=(0, 0, -1))) as fillet8_piece_2:
        with BuildLine():
            Bezier((4 + FILLET8_SIZE, 0), (4, 0), (4, FILLET8_SIZE_2), weights=[1, 0.707106781, 1])
            Line((4, FILLET8_SIZE_2), (4, 0))
            Line((4, 0), (4 + FILLET8_SIZE, 0))
        make_face()
    revolve(axis=Axis((41.5, 2, -26), (0, 1, 0)), revolution_arc=180)


solid = part.part
